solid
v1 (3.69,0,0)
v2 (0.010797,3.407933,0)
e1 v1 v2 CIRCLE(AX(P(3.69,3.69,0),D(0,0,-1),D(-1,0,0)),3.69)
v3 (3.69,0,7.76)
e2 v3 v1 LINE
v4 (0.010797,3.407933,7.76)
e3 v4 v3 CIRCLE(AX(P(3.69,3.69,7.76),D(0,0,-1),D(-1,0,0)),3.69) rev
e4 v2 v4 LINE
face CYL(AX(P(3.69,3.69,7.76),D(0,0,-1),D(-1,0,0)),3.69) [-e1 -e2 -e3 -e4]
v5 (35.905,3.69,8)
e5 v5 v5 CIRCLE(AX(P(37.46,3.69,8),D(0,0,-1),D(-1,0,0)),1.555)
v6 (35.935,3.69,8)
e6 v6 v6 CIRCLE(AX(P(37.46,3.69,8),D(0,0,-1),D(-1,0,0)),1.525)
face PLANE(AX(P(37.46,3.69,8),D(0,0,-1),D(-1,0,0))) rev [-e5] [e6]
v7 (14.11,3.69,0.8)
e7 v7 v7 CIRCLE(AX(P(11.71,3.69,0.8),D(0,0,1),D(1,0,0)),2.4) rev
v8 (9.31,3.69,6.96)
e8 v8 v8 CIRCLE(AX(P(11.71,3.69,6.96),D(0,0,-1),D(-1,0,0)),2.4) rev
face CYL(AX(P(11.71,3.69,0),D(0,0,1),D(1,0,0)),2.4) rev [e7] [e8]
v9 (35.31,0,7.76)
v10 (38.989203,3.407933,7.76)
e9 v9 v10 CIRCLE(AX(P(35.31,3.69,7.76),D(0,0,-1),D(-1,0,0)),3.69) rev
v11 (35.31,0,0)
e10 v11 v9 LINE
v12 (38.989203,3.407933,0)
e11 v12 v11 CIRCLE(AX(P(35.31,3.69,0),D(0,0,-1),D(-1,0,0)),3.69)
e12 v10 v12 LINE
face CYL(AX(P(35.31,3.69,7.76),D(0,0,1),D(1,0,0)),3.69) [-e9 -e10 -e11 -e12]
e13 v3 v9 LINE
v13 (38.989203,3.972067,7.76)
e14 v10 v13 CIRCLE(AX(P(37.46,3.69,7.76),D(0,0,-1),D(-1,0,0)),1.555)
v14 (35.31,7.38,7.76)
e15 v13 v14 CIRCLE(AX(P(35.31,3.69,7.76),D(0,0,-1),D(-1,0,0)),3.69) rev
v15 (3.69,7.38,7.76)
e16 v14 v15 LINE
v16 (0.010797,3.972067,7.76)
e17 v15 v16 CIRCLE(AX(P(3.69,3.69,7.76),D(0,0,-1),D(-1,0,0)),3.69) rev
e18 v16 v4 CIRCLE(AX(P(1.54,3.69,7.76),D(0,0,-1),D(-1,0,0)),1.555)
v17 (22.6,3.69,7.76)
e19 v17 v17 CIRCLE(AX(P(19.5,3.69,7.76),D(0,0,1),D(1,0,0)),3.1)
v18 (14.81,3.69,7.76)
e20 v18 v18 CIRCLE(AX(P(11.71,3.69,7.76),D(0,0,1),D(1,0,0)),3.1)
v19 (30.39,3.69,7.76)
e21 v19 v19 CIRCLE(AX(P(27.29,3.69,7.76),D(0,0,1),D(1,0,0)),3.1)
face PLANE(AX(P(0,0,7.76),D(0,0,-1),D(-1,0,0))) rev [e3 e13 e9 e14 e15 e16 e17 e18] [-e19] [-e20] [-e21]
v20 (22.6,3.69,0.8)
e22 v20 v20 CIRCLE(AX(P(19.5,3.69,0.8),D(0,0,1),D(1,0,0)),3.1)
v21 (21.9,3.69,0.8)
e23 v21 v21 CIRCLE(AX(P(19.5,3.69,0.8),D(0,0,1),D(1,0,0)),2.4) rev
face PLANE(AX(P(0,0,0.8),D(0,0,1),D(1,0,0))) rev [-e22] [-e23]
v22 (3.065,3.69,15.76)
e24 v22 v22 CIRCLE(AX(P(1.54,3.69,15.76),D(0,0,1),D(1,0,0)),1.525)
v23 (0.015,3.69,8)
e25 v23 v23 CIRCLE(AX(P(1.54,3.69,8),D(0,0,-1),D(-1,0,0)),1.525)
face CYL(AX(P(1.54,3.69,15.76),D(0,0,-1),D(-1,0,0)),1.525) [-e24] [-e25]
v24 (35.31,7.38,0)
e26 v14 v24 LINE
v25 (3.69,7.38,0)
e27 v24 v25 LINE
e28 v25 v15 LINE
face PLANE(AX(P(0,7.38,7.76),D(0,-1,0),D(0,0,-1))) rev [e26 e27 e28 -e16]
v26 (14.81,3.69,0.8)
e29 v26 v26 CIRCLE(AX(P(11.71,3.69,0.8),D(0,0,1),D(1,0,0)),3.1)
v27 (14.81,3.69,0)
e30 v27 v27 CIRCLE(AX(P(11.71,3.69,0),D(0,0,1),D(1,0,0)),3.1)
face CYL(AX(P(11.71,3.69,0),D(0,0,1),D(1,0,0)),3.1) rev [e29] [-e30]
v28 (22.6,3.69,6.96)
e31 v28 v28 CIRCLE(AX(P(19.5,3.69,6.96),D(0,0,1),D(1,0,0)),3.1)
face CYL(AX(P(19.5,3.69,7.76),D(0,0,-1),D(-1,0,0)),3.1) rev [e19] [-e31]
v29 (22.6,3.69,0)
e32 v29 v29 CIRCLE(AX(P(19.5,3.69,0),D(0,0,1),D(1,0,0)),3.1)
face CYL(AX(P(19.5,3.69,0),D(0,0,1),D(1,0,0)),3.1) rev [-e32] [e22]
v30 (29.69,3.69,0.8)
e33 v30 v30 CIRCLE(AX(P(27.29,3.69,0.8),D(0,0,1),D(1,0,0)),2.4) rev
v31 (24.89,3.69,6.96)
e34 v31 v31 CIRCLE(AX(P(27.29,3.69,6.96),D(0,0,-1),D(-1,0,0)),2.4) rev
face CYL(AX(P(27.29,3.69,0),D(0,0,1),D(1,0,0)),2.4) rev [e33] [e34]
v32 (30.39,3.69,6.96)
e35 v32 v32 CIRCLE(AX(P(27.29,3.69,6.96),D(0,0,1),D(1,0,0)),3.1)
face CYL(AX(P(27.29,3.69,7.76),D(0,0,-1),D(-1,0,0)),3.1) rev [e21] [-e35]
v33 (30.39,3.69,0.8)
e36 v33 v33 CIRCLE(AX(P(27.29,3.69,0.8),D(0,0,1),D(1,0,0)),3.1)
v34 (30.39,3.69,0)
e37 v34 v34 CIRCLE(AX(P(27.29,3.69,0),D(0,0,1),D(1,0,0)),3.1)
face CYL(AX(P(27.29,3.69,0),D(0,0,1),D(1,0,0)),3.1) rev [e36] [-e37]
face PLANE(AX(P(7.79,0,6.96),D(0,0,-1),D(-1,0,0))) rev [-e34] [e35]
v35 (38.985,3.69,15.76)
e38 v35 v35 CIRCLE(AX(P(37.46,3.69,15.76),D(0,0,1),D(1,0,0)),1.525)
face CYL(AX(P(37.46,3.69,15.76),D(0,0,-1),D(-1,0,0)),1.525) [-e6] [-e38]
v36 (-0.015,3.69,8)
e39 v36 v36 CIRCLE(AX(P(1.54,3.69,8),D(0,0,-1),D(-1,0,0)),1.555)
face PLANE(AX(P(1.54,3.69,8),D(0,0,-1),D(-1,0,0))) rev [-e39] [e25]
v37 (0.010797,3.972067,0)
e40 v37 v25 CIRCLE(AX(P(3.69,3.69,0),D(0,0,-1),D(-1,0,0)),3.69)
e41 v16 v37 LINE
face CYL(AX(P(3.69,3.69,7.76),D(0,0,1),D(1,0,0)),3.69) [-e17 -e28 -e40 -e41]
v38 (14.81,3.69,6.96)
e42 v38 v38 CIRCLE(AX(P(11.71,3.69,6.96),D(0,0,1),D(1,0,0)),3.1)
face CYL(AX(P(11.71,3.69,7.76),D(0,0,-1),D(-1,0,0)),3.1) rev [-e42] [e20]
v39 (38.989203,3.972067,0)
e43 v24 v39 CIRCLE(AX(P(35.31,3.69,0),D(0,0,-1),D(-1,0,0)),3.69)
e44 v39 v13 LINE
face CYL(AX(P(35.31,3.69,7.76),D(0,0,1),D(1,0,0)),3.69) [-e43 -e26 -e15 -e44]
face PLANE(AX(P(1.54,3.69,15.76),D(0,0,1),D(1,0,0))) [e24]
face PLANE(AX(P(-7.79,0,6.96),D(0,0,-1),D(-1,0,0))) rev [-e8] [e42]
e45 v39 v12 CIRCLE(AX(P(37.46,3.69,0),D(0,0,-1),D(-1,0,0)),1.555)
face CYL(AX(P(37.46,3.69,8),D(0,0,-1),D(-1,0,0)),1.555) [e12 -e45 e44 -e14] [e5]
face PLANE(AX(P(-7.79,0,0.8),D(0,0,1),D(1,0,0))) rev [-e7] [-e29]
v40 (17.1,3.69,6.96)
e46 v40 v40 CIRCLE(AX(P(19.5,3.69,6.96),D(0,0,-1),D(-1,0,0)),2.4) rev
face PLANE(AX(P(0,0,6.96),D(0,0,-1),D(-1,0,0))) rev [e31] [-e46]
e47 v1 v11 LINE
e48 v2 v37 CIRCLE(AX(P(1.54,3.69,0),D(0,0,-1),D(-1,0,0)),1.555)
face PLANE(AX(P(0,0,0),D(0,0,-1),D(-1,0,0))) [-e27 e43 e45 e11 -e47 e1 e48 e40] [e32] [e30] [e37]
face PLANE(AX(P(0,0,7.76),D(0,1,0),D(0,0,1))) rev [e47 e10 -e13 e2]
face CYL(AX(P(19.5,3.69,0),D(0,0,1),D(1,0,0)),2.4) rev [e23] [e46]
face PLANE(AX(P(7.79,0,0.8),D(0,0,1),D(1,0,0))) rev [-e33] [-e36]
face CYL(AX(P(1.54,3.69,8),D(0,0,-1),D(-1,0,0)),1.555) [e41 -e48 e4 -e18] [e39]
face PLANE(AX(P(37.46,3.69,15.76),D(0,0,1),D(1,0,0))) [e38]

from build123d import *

# Parameters (mm, degrees)
SKETCH1_W                = 39
SKETCH1_H                = 7.38
BOSS_EXTRUDE1_DEPTH      = 7.76
SKETCH2_R                = 2.4
CUT_EXTRUDE1_DEPTH       = 7.76
CUT_EXTRUDE2_OUTLINE_R   = 3.1
CUT_EXTRUDE2_OUTLINE_R_2 = 2.4
CUT_EXTRUDE2_DEPTH       = 0.8
CUT_EXTRUDE3_START       = 6.96
CUT_EXTRUDE3_OUTLINE_R   = 3.1
CUT_EXTRUDE3_OUTLINE_R_2 = 2.4
CUT_EXTRUDE3_DEPTH       = 0.8
LPATTERN3_COUNT          = 3
LPATTERN3_PITCH          = 7.79
LPATTERN6_COUNT          = 3
LPATTERN6_PITCH          = 7.79
FILLET1_R                = 3.69
FILLET2_R                = 3.69
FILLET3_R                = 3.69
FILLET4_R                = 3.69
SKETCH3_R                = 3.1
BOSS_EXTRUDE2_DEPTH      = 7.76
BOSS_EXTRUDE3_START      = -7.76
SKETCH4_R                = 3.1
BOSS_EXTRUDE3_DEPTH      = 7.76
SKETCH11_R               = 1.525
BOSS_EXTRUDE7_DEPTH      = 8
SKETCH12_R               = 1.555
BOSS_EXTRUDE8_DEPTH      = 8
SKETCH14_R               = 1.555
BOSS_EXTRUDE9_DEPTH      = 8


# Read off the part's stored shape, not the designer's step: Cut-Extrude2, Cut-Extrude3
with BuildPart() as part:
    # Sketch1 → Boss-Extrude1 (new body)
    with BuildSketch(Plane.XY):
        with Locations((19.5, 3.69)):
            Rectangle(SKETCH1_W, SKETCH1_H)
    extrude(amount=BOSS_EXTRUDE1_DEPTH)

    # Sketch2 → Cut-Extrude1 (cut)
    with BuildSketch(Plane.XY.offset(7.76)):
        with Locations((19.5, 3.69)):
            Circle(SKETCH2_R)
    cut_extrude1 = extrude(amount=-CUT_EXTRUDE1_DEPTH, mode=Mode.SUBTRACT)

    # Cut-Extrude2 outline → Cut-Extrude2 (cut)
    with BuildSketch(Plane.XY):
        with Locations((19.5, 3.69)):
            Circle(CUT_EXTRUDE2_OUTLINE_R)
        with Locations((19.5, 3.69)):
            Circle(CUT_EXTRUDE2_OUTLINE_R_2, mode=Mode.SUBTRACT)
    cut_extrude2 = extrude(amount=CUT_EXTRUDE2_DEPTH, mode=Mode.SUBTRACT)

    # Cut-Extrude3 outline → Cut-Extrude3 (cut)
    with BuildSketch(Plane.XY.offset(CUT_EXTRUDE3_START)):
        with Locations((19.5, 3.69)):
            Circle(CUT_EXTRUDE3_OUTLINE_R)
        with Locations((19.5, 3.69)):
            Circle(CUT_EXTRUDE3_OUTLINE_R_2, mode=Mode.SUBTRACT)
    cut_extrude3 = extrude(amount=CUT_EXTRUDE3_DEPTH, mode=Mode.SUBTRACT)

    # LPattern3: Cut-Extrude1, Cut-Extrude2, Cut-Extrude3 ×3
    with Locations(*[(-i * LPATTERN3_PITCH, 0, 0) for i in range(1, LPATTERN3_COUNT)]):
        add(cut_extrude1, mode=Mode.SUBTRACT)
        add(cut_extrude2, mode=Mode.SUBTRACT)
        add(cut_extrude3, mode=Mode.SUBTRACT)

    # LPattern6: Cut-Extrude1, Cut-Extrude2, Cut-Extrude3 ×3
    with Locations(*[(i * LPATTERN6_PITCH, 0, 0) for i in range(1, LPATTERN6_COUNT)]):
        add(cut_extrude1, mode=Mode.SUBTRACT)
        add(cut_extrude2, mode=Mode.SUBTRACT)
        add(cut_extrude3, mode=Mode.SUBTRACT)

    # Fillet1
    fillet1_edges = [part.edges().sort_by_distance(p)[0] for p in [
        (0, 7.38, 3.88),
    ]]
    fillet(fillet1_edges, radius=FILLET1_R)

    # Fillet2
    fillet2_edges = [part.edges().sort_by_distance(p)[0] for p in [
        (0, 0, 3.88),
    ]]
    fillet(fillet2_edges, radius=FILLET2_R - 0.0001)  # a hair under: the kernel refuses the full size

    # Fillet3
    fillet3_edges = [part.edges().sort_by_distance(p)[0] for p in [
        (39, 7.38, 3.88),
    ]]
    fillet(fillet3_edges, radius=FILLET3_R)

    # Fillet4
    fillet4_edges = [part.edges().sort_by_distance(p)[0] for p in [
        (39, 0, 3.88),
    ]]
    fillet(fillet4_edges, radius=FILLET4_R - 0.0001)  # a hair under: the kernel refuses the full size

    # Sketch3 → Boss-Extrude2 (add)
    with BuildSketch(Plane(origin=(0, 0, 0), x_dir=(-1, 0, 0), z_dir=(0, 0, -1))):
        with Locations((-35.08, 3.69)):
            Circle(SKETCH3_R)
    extrude(amount=-BOSS_EXTRUDE2_DEPTH)

    # Sketch4 → Boss-Extrude3 (add)
    with BuildSketch(Plane.XY.offset(7.76).offset(BOSS_EXTRUDE3_START)):
        with Locations((3.92, 3.69)):
            Circle(SKETCH4_R)
    extrude(amount=BOSS_EXTRUDE3_DEPTH)

    # Sketch11 → Boss-Extrude7 (add)
    with BuildSketch(Plane.XY.offset(7.76)):
        with Locations(Location((1.54, 3.69, 0), (0, 0, 180))):
            Circle(SKETCH11_R)
        with Locations(Location((37.46, 3.69, 0), (0, 0, 180))):
            Circle(SKETCH11_R)
    extrude(amount=BOSS_EXTRUDE7_DEPTH)

    # Sketch12 → Boss-Extrude8 (add)
    with BuildSketch(Plane(origin=(0, 0, 0), x_dir=(-1, 0, 0), z_dir=(0, 0, -1))):
        with Locations((-37.46, 3.69)):
            Circle(SKETCH12_R)
    extrude(amount=-BOSS_EXTRUDE8_DEPTH)

    # Sketch14 → Boss-Extrude9 (add)
    with BuildSketch(Plane(origin=(0, 0, 0), x_dir=(-1, 0, 0), z_dir=(0, 0, -1))):
        with Locations((-1.54, 3.69)):
            Circle(SKETCH14_R)
    extrude(amount=-BOSS_EXTRUDE9_DEPTH)


solid = part.part
